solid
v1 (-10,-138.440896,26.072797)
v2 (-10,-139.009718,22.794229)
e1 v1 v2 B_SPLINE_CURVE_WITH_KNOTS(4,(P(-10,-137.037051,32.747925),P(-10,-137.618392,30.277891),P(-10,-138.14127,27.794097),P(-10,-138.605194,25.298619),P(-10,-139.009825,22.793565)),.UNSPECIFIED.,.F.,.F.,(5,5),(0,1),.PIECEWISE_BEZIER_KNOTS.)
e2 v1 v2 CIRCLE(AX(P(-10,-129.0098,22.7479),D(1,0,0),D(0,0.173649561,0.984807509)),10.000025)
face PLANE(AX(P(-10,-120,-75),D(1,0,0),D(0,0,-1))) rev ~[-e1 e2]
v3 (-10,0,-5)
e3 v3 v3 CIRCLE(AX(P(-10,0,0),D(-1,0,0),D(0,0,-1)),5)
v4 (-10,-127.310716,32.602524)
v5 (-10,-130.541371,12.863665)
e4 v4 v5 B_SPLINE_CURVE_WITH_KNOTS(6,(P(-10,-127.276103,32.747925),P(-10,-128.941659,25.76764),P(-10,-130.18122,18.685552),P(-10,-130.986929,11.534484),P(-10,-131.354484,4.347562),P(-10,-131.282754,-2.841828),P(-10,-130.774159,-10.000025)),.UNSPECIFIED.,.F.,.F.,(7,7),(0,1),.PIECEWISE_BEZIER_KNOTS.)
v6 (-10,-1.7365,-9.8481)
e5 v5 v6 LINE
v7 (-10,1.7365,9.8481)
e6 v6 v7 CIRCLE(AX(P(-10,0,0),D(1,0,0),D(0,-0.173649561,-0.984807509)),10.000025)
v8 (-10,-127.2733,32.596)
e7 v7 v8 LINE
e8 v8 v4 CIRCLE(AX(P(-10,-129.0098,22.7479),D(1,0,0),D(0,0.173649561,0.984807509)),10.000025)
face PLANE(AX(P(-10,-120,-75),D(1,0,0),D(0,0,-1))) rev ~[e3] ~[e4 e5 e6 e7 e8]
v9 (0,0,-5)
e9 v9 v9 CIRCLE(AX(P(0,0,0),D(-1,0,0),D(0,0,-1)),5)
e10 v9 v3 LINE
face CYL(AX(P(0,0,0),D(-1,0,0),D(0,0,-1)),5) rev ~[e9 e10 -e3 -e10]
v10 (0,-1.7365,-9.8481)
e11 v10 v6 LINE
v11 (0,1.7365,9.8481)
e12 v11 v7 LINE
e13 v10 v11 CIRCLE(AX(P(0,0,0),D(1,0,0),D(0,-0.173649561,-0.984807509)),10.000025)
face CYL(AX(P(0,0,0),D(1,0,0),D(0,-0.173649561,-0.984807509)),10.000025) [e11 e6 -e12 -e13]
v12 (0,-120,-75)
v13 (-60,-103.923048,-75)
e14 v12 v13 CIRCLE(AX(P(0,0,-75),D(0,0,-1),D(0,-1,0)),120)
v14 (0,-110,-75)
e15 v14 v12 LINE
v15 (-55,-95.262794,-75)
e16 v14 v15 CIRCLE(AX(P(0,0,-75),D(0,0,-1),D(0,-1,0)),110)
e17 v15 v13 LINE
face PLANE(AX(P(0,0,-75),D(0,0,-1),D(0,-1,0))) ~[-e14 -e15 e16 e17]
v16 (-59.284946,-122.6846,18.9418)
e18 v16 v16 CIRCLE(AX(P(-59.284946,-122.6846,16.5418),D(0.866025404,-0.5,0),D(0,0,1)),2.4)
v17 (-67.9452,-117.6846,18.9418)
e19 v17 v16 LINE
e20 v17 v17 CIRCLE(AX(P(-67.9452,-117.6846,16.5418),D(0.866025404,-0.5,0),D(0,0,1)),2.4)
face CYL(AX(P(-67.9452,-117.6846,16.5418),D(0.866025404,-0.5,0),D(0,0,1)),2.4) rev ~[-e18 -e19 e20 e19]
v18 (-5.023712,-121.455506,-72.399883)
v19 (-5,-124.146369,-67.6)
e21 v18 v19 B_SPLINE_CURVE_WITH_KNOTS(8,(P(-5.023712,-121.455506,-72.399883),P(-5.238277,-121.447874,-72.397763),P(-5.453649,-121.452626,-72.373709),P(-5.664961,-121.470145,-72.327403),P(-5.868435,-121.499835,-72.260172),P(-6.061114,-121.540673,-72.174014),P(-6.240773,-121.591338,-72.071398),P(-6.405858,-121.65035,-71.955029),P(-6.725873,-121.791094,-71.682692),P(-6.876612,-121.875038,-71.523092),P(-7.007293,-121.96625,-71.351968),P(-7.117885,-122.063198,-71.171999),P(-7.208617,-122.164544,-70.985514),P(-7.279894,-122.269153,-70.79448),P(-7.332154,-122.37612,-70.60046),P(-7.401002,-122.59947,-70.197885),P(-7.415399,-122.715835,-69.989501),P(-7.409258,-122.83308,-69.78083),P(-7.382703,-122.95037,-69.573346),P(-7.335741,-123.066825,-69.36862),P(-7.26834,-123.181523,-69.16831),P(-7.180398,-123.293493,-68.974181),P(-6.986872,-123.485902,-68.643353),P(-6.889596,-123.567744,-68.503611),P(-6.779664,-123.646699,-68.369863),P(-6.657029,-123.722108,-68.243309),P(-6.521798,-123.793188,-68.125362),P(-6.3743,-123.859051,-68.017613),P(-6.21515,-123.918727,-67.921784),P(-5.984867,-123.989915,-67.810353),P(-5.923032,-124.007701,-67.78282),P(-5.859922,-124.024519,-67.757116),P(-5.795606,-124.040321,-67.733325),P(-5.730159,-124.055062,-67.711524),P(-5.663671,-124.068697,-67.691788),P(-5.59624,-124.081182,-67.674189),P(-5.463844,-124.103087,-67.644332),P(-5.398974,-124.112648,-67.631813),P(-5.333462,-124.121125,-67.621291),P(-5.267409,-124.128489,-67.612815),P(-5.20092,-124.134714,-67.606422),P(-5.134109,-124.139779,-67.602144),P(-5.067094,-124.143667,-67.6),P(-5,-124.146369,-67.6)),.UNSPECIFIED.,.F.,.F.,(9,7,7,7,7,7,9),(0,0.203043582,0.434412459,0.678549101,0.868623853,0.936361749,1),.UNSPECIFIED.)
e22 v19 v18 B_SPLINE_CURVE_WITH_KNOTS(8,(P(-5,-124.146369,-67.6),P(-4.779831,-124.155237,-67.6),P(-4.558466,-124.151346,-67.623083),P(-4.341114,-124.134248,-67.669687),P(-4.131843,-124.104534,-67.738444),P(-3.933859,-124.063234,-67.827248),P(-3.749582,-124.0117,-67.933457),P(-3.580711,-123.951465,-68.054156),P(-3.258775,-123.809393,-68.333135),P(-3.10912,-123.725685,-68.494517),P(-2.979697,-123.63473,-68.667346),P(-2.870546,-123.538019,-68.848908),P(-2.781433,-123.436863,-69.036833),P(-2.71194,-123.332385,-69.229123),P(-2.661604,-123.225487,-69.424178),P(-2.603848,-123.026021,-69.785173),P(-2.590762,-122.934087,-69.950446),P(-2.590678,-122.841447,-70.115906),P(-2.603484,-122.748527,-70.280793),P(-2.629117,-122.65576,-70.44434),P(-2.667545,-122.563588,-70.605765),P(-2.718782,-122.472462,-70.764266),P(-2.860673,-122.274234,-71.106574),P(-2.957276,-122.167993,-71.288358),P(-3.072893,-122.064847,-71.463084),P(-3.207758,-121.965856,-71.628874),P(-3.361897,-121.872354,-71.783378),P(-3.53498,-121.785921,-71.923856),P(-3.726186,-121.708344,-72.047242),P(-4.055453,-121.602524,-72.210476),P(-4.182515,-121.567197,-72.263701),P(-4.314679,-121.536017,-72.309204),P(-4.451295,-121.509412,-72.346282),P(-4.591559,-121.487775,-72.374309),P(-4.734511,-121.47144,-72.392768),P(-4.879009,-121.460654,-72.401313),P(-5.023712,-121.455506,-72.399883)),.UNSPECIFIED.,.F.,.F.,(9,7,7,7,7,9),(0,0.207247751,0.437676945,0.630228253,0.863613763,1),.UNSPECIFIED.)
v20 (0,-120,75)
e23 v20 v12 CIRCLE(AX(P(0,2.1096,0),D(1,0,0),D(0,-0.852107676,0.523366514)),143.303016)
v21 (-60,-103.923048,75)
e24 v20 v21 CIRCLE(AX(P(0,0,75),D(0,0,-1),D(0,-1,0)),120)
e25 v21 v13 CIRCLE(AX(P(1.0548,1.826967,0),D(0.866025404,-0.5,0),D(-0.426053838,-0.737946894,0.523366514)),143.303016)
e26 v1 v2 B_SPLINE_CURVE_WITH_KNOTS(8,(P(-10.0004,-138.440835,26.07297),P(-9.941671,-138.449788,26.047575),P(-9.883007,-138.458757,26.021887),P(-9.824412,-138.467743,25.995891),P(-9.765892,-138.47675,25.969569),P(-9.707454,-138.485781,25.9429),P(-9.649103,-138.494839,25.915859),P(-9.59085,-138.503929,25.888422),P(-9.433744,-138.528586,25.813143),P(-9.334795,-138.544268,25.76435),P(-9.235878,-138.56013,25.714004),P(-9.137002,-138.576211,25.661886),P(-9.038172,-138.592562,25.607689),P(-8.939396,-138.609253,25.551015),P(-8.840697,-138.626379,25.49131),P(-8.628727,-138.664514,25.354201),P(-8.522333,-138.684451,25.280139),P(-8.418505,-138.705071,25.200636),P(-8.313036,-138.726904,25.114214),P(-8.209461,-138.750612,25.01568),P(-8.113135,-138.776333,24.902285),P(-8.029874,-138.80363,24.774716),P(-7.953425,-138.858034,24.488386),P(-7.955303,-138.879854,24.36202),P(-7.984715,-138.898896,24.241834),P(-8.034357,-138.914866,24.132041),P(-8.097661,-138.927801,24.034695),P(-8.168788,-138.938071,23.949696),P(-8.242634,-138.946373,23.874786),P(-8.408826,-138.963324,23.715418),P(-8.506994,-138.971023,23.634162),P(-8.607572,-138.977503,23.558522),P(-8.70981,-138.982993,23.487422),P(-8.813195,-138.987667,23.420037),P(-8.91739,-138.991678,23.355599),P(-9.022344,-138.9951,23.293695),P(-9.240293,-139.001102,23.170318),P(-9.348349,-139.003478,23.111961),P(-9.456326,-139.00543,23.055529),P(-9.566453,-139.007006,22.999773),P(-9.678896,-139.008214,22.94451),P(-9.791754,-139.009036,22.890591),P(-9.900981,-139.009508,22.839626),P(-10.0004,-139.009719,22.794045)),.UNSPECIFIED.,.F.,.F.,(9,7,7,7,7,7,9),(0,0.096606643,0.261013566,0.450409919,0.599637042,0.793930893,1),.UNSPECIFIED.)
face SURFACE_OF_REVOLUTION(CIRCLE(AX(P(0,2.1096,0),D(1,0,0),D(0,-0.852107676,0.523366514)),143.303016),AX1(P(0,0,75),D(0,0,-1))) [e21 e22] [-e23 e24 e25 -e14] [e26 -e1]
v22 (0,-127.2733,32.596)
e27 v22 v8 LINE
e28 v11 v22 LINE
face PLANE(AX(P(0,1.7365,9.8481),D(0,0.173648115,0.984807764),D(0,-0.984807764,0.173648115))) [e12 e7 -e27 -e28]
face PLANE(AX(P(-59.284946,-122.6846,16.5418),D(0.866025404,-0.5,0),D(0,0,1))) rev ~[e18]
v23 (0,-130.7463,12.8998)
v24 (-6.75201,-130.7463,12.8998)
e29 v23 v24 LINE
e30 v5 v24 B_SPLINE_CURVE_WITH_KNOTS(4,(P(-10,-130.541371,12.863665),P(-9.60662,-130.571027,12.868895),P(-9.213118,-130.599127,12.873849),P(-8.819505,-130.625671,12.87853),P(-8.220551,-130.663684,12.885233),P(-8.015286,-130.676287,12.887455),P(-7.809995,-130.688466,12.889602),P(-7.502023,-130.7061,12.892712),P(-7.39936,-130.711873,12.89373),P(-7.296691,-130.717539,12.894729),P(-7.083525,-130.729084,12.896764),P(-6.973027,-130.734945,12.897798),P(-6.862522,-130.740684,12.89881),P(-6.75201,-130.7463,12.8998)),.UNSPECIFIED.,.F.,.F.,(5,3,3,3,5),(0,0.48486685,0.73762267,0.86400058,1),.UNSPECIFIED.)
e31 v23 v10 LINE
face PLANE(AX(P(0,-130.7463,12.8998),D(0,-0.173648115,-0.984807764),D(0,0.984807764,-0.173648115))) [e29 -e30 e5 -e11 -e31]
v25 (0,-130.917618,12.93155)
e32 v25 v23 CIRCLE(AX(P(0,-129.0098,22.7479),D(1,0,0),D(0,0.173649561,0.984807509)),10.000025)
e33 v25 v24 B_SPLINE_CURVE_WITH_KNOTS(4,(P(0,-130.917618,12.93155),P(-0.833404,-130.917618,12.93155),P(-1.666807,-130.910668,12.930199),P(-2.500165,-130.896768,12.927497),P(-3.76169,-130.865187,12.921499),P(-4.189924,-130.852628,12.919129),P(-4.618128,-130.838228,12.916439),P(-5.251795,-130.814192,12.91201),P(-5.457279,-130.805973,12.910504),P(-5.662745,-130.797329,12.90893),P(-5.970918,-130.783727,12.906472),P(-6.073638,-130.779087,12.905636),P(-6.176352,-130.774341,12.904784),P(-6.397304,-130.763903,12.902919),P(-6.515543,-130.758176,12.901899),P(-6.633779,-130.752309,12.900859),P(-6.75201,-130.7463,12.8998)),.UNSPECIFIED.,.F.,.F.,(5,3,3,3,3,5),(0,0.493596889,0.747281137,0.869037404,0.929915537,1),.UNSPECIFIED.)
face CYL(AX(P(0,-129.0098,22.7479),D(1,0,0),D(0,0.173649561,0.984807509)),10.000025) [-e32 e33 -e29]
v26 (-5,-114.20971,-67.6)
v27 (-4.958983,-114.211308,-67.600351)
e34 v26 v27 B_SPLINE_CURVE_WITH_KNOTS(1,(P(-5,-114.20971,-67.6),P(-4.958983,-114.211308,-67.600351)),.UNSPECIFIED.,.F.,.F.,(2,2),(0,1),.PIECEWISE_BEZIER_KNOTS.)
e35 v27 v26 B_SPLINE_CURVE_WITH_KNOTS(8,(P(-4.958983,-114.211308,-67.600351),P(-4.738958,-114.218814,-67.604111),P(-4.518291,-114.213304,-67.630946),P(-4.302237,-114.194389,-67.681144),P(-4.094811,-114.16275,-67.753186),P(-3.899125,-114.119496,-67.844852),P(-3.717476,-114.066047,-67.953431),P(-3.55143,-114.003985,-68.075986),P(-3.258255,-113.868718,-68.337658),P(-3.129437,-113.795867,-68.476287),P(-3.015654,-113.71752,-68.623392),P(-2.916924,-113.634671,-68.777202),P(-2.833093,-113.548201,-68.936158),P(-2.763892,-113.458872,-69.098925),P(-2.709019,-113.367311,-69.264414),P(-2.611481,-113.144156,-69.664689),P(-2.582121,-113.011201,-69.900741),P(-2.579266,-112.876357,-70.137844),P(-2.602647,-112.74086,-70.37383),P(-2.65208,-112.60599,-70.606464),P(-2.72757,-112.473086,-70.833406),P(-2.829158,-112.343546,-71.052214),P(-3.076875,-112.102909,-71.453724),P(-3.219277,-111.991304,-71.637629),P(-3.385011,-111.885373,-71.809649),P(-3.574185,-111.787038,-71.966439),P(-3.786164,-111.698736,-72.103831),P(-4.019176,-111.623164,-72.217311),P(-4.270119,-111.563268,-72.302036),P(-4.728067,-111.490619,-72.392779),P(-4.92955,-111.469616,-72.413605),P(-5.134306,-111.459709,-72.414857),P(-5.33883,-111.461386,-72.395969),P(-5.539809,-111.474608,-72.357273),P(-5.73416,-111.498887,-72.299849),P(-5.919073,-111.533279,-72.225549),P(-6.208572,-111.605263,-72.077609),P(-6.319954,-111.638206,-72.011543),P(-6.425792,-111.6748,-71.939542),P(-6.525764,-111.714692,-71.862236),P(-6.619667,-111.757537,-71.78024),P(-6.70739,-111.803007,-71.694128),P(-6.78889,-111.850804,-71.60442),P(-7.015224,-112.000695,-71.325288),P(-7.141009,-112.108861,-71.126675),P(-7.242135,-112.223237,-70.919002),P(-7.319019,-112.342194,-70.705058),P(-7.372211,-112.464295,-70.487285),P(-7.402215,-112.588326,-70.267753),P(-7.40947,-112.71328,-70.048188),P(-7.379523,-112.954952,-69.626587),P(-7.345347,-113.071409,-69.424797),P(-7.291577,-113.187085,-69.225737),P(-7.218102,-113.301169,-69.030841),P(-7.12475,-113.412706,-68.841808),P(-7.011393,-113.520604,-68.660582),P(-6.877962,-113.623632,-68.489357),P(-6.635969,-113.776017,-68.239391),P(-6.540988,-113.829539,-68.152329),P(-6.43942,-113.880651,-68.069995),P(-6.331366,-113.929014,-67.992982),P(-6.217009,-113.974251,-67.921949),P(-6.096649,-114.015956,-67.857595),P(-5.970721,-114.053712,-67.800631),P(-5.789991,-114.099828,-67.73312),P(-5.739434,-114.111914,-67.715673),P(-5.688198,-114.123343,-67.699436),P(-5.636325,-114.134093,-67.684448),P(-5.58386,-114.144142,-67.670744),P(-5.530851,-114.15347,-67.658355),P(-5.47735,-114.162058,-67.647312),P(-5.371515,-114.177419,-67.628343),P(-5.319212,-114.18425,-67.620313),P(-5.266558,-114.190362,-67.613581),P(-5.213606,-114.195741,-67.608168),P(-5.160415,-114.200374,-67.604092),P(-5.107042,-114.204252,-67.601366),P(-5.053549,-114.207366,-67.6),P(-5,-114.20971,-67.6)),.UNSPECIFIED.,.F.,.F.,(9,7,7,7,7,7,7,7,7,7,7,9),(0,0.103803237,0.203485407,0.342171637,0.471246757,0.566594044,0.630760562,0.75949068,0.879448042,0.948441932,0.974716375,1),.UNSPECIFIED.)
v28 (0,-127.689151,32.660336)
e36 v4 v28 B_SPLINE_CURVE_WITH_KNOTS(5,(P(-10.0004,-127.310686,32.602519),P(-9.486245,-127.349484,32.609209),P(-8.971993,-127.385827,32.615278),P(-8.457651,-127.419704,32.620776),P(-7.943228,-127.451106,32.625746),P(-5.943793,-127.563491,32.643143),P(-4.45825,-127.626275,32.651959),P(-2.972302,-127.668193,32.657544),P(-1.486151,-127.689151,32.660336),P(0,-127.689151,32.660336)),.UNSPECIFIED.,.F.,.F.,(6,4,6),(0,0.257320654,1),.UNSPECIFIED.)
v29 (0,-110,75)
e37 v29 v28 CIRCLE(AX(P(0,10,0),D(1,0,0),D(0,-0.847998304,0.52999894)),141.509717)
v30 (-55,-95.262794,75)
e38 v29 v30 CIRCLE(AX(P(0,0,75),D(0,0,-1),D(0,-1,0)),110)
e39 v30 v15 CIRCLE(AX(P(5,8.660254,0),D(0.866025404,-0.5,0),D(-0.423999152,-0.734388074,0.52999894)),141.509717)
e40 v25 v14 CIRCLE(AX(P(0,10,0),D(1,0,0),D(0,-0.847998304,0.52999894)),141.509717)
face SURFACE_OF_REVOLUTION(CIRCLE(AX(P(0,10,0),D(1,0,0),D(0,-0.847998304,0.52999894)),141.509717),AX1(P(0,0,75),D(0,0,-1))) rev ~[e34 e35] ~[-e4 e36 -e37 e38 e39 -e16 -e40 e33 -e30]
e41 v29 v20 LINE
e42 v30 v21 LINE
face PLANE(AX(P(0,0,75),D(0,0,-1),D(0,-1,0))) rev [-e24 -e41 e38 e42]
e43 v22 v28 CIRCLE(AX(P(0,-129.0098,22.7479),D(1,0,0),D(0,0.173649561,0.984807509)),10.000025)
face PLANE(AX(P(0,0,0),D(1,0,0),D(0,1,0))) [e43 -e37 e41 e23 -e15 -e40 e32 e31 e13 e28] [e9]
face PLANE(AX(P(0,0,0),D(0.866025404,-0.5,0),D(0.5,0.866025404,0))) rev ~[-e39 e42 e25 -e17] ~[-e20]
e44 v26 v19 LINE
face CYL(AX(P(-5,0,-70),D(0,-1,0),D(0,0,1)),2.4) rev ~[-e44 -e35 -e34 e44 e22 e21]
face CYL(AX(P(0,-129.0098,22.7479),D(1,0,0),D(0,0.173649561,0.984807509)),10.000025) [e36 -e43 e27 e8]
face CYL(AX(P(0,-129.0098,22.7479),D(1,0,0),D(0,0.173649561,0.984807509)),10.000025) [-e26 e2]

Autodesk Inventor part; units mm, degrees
ref_plane "YZ Plane" through (0, 0, 0) normal (1, 0, 0) x (0, 1, 0)
ref_plane "XZ Plane" through (0, 0, 0) normal (0, 1, 0) x (-1, 0, 0)
ref_plane "XY Plane" through (0, 0, 0) normal (0, 0, 1) x (1, 0, 0)
sketch "スケッチ1" plane through (0, 0, 0) normal (1, 0, 0) x (0, 1, 0)
  line L0 (-110, 0) -> (-125, 0)
  line L1 (-110, 75) -> (-120, 75)
  arc A0 (-120, 75) -> (-120, -75) centre (2.1096, 0) ccw
  line L2 (0, 75) -> (0, -75)
  line L3 (-110, -75) -> (-120, -75)
  arc A1 (-110, 75) -> (-110, -75) centre (10, 0) ccw
  point P0 (0, 0)
  point P1 (0, 0)
  dimension "d0" = 150
  dimension "d2" = 0
  dimension "d4" = 10
  dimension "d35" = 20
revolve "回転1" add sketch "スケッチ1" angle 30 about axis through (0, 0, 75) along (0, 0, -1)
sketch "スケッチ2" plane through (0, -120, -75) normal (1, 0, 0) x (0, 0, -1)
  line L0 (-75, 120) -> (-97.7479, -9.0098) construction
  line L1 (-84.8481, 121.7365) -> (-107.596, -7.2733)
  line L2 (-87.8998, -10.7463) -> (-65.1519, 118.2635)
  arc A0 (-65.1519, 118.2635) -> (-84.8481, 121.7365) centre (-75, 120) ccw
  arc A1 (-107.596, -7.2733) -> (-87.8998, -10.7463) centre (-97.7479, -9.0098) ccw
  line L3 (-75, 120) -> (56, 120) construction
  point P0 (-86.374, 55.4951)
  dimension "d6" = 131
  dimension "d7" = 100
  dimension "d8" = 20
extrude "押し出し1" add sketch "スケッチ2" against normal blind 10
sketch "スケッチ3" plane through (0, -120, 75) normal (1, 0, 0) x (0, 0, -1)
  point P0 (75, 120)
  point P1 (75, 120)
hole "穴1" at (0, 0, 0) direction (-1, 0, 0) diameter 10 end through all
sketch "スケッチ5" plane through (1.0548, 1.8269, 0) normal (-0.8660254, 0.5, 0) x (-0.5, -0.8660254, 0)
  ellipse E0 centre (7.1096, 0) end of major axis (7.1096, -5) minor radius 4.3301 projected
  line L0 (7.1096, 0) -> (186.6716, 22.6929)
  arc A0 (122.1096, -75) -> (122.1096, 75) centre (0, 0) ccw projected
  point P0 (2.1096, 0)
  point P1 (138, 16.5418)
  dimension "d27" = 138
hole "穴3" at (-67.9452, -117.6846, 16.5418) direction (0.8660254, -0.5, 0) diameter 4.8 depth 10
sketch "スケッチ6" plane through (0, 0, 0) normal (0, 1, 0) x (-1, 0, 0)
  line L0 (0, -75) -> (0, 12.9316) projected
  line L1 (0, -75) -> (55, -75) projected
  point P0 (0, 0)
  point P1 (5, -70)
  dimension "d36" = 5
  dimension "d37" = 5
hole "穴4" at (-5, 0, -70) direction (0, -1, 0) diameter 4.8 end through all
properties part number "受動歩行_ver4"
